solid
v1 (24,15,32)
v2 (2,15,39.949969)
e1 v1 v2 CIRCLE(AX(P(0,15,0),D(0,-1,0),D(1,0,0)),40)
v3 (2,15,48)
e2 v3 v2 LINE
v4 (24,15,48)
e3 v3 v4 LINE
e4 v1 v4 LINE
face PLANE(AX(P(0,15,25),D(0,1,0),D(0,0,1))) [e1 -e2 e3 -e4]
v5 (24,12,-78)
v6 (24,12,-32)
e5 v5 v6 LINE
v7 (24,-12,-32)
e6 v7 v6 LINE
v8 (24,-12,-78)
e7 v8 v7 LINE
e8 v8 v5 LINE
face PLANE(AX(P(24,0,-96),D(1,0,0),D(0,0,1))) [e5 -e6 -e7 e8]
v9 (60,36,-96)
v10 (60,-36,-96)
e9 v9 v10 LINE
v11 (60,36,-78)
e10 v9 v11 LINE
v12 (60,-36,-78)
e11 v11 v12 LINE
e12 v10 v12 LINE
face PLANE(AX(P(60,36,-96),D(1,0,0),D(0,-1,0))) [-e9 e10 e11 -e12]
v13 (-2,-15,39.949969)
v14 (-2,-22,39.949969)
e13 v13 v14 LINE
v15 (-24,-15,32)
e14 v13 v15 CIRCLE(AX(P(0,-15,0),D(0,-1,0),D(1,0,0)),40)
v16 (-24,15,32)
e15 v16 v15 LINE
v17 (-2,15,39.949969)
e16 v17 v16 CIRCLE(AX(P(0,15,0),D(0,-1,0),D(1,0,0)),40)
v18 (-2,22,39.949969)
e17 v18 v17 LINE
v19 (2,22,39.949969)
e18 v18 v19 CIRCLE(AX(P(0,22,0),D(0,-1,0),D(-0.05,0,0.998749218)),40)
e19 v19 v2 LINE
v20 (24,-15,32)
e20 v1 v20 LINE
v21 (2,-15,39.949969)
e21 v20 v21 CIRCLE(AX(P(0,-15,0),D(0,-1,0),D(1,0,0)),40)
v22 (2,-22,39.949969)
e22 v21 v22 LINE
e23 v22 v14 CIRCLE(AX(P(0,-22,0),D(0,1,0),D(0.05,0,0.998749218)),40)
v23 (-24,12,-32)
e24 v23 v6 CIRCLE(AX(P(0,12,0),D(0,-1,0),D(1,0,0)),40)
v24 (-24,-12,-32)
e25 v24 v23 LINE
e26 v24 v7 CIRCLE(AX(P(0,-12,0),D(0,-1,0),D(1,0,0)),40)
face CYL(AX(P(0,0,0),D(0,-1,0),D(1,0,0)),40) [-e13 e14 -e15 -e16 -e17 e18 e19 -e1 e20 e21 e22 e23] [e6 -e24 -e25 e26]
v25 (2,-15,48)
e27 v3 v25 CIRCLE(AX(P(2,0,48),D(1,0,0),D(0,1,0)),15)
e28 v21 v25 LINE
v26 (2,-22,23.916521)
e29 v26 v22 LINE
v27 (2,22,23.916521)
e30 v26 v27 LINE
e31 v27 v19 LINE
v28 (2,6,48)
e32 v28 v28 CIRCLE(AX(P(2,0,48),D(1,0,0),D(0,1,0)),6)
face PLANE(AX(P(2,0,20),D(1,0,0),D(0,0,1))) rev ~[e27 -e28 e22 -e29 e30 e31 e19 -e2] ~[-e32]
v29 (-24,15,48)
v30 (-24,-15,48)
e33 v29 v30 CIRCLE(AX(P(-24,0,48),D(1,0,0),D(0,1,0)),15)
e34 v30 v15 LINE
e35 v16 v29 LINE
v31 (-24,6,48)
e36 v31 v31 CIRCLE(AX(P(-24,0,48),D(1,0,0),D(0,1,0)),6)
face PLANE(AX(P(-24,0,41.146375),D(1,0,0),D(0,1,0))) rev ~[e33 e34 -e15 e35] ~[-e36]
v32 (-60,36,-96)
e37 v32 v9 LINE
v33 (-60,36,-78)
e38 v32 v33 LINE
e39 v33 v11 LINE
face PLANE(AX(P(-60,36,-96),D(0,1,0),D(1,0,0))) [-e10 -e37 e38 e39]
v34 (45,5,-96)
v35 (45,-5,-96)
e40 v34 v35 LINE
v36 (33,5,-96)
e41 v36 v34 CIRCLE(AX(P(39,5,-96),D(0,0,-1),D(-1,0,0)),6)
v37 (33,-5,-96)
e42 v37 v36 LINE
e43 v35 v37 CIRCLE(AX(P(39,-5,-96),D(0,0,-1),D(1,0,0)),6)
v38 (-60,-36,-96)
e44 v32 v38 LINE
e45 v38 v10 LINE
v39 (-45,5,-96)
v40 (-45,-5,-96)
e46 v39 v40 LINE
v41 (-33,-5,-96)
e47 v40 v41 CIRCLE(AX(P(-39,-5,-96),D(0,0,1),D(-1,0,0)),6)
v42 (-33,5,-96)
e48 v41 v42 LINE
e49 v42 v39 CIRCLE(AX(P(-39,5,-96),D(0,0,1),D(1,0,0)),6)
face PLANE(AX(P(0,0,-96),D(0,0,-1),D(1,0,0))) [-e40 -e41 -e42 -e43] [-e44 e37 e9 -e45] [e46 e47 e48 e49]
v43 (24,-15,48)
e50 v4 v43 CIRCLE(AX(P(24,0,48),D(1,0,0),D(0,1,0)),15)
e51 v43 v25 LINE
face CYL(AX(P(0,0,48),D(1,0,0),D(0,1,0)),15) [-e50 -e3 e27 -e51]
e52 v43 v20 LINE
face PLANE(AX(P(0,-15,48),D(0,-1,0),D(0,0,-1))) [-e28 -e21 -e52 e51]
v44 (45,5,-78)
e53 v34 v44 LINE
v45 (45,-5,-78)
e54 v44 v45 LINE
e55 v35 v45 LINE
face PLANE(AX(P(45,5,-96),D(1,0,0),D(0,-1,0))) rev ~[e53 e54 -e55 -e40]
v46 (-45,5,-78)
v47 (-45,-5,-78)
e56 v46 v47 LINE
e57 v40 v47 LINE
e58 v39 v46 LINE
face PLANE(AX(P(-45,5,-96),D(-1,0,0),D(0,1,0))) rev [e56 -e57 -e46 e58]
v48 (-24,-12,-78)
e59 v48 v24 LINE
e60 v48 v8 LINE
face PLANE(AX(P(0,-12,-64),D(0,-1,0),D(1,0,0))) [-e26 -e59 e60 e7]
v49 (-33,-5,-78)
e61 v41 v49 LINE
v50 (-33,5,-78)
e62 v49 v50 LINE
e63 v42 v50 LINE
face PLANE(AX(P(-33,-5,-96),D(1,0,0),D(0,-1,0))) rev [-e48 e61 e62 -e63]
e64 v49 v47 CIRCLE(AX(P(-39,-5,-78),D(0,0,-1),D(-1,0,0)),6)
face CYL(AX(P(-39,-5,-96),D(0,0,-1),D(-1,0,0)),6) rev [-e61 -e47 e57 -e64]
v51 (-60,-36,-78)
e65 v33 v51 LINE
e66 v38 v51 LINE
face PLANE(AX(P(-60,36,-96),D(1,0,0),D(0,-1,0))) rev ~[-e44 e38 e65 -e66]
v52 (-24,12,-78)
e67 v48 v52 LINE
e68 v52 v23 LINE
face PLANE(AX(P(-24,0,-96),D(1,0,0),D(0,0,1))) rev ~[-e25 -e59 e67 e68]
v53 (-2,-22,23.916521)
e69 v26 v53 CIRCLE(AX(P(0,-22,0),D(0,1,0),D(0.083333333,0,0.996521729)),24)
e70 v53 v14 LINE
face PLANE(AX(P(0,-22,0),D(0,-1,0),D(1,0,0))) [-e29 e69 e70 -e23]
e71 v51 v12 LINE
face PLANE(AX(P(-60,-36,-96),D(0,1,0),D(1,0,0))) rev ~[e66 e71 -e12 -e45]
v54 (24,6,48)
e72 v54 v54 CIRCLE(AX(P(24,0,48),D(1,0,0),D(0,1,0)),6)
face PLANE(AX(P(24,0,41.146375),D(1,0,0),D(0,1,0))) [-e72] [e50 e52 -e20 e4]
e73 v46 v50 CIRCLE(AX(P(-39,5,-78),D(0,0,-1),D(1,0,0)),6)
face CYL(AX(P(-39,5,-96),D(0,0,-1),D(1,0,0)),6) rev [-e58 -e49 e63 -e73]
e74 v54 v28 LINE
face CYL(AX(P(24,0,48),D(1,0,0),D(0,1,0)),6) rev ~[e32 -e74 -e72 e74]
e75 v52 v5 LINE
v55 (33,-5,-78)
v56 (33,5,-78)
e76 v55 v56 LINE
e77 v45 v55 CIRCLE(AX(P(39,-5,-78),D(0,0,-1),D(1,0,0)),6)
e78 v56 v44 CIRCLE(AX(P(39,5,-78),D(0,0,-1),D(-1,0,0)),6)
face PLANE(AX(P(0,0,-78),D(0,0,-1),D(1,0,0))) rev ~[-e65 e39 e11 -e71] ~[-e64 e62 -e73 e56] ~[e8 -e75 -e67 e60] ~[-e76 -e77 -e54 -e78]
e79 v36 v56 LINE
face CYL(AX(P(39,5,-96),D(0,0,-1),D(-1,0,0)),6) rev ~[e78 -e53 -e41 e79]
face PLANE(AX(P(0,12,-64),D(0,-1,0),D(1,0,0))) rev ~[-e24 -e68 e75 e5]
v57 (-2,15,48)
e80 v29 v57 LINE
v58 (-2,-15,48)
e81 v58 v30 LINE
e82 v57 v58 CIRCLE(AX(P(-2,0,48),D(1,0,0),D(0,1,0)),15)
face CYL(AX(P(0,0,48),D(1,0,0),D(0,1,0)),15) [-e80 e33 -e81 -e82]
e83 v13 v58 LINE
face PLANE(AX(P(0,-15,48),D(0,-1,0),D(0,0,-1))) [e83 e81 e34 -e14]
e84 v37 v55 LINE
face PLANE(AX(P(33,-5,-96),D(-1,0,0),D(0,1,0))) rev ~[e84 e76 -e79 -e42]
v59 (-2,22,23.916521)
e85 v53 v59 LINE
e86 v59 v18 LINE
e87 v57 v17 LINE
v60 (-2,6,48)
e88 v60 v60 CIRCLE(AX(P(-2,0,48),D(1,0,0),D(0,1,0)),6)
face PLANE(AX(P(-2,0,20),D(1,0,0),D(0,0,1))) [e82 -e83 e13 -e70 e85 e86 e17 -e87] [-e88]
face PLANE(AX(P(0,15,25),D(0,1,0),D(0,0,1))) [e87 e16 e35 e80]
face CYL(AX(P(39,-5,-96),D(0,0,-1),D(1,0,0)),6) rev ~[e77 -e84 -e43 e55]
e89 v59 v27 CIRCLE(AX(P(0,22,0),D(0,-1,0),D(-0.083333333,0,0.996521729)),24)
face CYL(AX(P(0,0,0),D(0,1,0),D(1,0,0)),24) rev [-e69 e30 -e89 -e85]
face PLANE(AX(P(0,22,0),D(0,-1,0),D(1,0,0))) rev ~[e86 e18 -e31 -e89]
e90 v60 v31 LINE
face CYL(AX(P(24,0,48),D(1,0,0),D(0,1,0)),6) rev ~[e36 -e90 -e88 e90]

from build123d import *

# Parameters (mm, degrees)
F0_R      = 40
F0_R_2    = 24
F1_DEPTH  = 22
F2_W      = 48
F2_H      = 64
F3_DEPTH  = 12
F4_W      = 120
F4_H      = 72
F5_DEPTH  = 18
F7_DEPTH  = 24
F8_R      = 6
F9_DEPTH  = 84.001
F11_DEPTH = 25
F12_W     = 4
F12_H     = 50
F13_DEPTH = 25


# Not quite as in the source:
# - a pattern or mirror of a feature is missing from the dataset's text; its kind, count and spacing are read off the source's solid


with BuildPart() as f1:
    # F0 (on Front) → F1 (new body, symmetric)
    with BuildSketch(Plane.XZ):
        Circle(F0_R)
        Circle(F0_R_2, mode=Mode.SUBTRACT)
    extrude(amount=F1_DEPTH, both=True)

    # F2 (on Front) → F3 (join, symmetric)
    with BuildSketch(Plane.XZ):
        with Locations((0, -64)):
            Rectangle(F2_W, F2_H)
    extrude(amount=F3_DEPTH, both=True)

    # F4 (on face) → F5 (join)
    with BuildSketch(Plane(origin=(0, 0, -96), x_dir=(1, 0, 0), z_dir=(0, 0, -1))):
        Rectangle(F4_W, F4_H)
    extrude(amount=-F5_DEPTH)

    # F6 (on Right) → F7 (join, symmetric)
    with BuildSketch(Plane.YZ):
        with BuildLine():
            Line((-15, 25), (15, 25))
            Line((15, 25), (15, 48))
            ThreePointArc((15, 48), (0, 63), (-15, 48))
            Line((-15, 48), (-15, 25))
        make_face()
    extrude(amount=F7_DEPTH, both=True)

    # F8 (on face) → F9 (cut, through all)
    with BuildSketch(Plane.YZ.offset(24)):
        with Locations((0, 48)):
            Circle(F8_R)
    extrude(amount=-F9_DEPTH, mode=Mode.SUBTRACT)

    # F10 (on face) → F11 (cut)
    with BuildSketch(Plane(origin=(0, 0, -96), x_dir=(1, 0, 0), z_dir=(0, 0, -1))):
        with BuildLine():
            Line((45, -5), (45, 5))
            ThreePointArc((45, 5), (39, 11), (33, 5))
            Line((33, 5), (33, -5))
            ThreePointArc((33, -5), (39, -11), (45, -5))
        make_face()
    f11 = extrude(amount=-F11_DEPTH, mode=Mode.SUBTRACT)

    # F11_copies: F11 across plane
    add(f11.mirror(Plane(origin=(0, 0, 0), x_dir=(0, 0, -1), z_dir=(-1, 0, 0))), mode=Mode.SUBTRACT)

    # F12 (on Front) → F13 (cut, symmetric)
    with BuildSketch(Plane.XZ):
        with Locations((0, 45)):
            Rectangle(F12_W, F12_H)
    extrude(amount=F13_DEPTH, both=True, mode=Mode.SUBTRACT)


solid = f1.part
